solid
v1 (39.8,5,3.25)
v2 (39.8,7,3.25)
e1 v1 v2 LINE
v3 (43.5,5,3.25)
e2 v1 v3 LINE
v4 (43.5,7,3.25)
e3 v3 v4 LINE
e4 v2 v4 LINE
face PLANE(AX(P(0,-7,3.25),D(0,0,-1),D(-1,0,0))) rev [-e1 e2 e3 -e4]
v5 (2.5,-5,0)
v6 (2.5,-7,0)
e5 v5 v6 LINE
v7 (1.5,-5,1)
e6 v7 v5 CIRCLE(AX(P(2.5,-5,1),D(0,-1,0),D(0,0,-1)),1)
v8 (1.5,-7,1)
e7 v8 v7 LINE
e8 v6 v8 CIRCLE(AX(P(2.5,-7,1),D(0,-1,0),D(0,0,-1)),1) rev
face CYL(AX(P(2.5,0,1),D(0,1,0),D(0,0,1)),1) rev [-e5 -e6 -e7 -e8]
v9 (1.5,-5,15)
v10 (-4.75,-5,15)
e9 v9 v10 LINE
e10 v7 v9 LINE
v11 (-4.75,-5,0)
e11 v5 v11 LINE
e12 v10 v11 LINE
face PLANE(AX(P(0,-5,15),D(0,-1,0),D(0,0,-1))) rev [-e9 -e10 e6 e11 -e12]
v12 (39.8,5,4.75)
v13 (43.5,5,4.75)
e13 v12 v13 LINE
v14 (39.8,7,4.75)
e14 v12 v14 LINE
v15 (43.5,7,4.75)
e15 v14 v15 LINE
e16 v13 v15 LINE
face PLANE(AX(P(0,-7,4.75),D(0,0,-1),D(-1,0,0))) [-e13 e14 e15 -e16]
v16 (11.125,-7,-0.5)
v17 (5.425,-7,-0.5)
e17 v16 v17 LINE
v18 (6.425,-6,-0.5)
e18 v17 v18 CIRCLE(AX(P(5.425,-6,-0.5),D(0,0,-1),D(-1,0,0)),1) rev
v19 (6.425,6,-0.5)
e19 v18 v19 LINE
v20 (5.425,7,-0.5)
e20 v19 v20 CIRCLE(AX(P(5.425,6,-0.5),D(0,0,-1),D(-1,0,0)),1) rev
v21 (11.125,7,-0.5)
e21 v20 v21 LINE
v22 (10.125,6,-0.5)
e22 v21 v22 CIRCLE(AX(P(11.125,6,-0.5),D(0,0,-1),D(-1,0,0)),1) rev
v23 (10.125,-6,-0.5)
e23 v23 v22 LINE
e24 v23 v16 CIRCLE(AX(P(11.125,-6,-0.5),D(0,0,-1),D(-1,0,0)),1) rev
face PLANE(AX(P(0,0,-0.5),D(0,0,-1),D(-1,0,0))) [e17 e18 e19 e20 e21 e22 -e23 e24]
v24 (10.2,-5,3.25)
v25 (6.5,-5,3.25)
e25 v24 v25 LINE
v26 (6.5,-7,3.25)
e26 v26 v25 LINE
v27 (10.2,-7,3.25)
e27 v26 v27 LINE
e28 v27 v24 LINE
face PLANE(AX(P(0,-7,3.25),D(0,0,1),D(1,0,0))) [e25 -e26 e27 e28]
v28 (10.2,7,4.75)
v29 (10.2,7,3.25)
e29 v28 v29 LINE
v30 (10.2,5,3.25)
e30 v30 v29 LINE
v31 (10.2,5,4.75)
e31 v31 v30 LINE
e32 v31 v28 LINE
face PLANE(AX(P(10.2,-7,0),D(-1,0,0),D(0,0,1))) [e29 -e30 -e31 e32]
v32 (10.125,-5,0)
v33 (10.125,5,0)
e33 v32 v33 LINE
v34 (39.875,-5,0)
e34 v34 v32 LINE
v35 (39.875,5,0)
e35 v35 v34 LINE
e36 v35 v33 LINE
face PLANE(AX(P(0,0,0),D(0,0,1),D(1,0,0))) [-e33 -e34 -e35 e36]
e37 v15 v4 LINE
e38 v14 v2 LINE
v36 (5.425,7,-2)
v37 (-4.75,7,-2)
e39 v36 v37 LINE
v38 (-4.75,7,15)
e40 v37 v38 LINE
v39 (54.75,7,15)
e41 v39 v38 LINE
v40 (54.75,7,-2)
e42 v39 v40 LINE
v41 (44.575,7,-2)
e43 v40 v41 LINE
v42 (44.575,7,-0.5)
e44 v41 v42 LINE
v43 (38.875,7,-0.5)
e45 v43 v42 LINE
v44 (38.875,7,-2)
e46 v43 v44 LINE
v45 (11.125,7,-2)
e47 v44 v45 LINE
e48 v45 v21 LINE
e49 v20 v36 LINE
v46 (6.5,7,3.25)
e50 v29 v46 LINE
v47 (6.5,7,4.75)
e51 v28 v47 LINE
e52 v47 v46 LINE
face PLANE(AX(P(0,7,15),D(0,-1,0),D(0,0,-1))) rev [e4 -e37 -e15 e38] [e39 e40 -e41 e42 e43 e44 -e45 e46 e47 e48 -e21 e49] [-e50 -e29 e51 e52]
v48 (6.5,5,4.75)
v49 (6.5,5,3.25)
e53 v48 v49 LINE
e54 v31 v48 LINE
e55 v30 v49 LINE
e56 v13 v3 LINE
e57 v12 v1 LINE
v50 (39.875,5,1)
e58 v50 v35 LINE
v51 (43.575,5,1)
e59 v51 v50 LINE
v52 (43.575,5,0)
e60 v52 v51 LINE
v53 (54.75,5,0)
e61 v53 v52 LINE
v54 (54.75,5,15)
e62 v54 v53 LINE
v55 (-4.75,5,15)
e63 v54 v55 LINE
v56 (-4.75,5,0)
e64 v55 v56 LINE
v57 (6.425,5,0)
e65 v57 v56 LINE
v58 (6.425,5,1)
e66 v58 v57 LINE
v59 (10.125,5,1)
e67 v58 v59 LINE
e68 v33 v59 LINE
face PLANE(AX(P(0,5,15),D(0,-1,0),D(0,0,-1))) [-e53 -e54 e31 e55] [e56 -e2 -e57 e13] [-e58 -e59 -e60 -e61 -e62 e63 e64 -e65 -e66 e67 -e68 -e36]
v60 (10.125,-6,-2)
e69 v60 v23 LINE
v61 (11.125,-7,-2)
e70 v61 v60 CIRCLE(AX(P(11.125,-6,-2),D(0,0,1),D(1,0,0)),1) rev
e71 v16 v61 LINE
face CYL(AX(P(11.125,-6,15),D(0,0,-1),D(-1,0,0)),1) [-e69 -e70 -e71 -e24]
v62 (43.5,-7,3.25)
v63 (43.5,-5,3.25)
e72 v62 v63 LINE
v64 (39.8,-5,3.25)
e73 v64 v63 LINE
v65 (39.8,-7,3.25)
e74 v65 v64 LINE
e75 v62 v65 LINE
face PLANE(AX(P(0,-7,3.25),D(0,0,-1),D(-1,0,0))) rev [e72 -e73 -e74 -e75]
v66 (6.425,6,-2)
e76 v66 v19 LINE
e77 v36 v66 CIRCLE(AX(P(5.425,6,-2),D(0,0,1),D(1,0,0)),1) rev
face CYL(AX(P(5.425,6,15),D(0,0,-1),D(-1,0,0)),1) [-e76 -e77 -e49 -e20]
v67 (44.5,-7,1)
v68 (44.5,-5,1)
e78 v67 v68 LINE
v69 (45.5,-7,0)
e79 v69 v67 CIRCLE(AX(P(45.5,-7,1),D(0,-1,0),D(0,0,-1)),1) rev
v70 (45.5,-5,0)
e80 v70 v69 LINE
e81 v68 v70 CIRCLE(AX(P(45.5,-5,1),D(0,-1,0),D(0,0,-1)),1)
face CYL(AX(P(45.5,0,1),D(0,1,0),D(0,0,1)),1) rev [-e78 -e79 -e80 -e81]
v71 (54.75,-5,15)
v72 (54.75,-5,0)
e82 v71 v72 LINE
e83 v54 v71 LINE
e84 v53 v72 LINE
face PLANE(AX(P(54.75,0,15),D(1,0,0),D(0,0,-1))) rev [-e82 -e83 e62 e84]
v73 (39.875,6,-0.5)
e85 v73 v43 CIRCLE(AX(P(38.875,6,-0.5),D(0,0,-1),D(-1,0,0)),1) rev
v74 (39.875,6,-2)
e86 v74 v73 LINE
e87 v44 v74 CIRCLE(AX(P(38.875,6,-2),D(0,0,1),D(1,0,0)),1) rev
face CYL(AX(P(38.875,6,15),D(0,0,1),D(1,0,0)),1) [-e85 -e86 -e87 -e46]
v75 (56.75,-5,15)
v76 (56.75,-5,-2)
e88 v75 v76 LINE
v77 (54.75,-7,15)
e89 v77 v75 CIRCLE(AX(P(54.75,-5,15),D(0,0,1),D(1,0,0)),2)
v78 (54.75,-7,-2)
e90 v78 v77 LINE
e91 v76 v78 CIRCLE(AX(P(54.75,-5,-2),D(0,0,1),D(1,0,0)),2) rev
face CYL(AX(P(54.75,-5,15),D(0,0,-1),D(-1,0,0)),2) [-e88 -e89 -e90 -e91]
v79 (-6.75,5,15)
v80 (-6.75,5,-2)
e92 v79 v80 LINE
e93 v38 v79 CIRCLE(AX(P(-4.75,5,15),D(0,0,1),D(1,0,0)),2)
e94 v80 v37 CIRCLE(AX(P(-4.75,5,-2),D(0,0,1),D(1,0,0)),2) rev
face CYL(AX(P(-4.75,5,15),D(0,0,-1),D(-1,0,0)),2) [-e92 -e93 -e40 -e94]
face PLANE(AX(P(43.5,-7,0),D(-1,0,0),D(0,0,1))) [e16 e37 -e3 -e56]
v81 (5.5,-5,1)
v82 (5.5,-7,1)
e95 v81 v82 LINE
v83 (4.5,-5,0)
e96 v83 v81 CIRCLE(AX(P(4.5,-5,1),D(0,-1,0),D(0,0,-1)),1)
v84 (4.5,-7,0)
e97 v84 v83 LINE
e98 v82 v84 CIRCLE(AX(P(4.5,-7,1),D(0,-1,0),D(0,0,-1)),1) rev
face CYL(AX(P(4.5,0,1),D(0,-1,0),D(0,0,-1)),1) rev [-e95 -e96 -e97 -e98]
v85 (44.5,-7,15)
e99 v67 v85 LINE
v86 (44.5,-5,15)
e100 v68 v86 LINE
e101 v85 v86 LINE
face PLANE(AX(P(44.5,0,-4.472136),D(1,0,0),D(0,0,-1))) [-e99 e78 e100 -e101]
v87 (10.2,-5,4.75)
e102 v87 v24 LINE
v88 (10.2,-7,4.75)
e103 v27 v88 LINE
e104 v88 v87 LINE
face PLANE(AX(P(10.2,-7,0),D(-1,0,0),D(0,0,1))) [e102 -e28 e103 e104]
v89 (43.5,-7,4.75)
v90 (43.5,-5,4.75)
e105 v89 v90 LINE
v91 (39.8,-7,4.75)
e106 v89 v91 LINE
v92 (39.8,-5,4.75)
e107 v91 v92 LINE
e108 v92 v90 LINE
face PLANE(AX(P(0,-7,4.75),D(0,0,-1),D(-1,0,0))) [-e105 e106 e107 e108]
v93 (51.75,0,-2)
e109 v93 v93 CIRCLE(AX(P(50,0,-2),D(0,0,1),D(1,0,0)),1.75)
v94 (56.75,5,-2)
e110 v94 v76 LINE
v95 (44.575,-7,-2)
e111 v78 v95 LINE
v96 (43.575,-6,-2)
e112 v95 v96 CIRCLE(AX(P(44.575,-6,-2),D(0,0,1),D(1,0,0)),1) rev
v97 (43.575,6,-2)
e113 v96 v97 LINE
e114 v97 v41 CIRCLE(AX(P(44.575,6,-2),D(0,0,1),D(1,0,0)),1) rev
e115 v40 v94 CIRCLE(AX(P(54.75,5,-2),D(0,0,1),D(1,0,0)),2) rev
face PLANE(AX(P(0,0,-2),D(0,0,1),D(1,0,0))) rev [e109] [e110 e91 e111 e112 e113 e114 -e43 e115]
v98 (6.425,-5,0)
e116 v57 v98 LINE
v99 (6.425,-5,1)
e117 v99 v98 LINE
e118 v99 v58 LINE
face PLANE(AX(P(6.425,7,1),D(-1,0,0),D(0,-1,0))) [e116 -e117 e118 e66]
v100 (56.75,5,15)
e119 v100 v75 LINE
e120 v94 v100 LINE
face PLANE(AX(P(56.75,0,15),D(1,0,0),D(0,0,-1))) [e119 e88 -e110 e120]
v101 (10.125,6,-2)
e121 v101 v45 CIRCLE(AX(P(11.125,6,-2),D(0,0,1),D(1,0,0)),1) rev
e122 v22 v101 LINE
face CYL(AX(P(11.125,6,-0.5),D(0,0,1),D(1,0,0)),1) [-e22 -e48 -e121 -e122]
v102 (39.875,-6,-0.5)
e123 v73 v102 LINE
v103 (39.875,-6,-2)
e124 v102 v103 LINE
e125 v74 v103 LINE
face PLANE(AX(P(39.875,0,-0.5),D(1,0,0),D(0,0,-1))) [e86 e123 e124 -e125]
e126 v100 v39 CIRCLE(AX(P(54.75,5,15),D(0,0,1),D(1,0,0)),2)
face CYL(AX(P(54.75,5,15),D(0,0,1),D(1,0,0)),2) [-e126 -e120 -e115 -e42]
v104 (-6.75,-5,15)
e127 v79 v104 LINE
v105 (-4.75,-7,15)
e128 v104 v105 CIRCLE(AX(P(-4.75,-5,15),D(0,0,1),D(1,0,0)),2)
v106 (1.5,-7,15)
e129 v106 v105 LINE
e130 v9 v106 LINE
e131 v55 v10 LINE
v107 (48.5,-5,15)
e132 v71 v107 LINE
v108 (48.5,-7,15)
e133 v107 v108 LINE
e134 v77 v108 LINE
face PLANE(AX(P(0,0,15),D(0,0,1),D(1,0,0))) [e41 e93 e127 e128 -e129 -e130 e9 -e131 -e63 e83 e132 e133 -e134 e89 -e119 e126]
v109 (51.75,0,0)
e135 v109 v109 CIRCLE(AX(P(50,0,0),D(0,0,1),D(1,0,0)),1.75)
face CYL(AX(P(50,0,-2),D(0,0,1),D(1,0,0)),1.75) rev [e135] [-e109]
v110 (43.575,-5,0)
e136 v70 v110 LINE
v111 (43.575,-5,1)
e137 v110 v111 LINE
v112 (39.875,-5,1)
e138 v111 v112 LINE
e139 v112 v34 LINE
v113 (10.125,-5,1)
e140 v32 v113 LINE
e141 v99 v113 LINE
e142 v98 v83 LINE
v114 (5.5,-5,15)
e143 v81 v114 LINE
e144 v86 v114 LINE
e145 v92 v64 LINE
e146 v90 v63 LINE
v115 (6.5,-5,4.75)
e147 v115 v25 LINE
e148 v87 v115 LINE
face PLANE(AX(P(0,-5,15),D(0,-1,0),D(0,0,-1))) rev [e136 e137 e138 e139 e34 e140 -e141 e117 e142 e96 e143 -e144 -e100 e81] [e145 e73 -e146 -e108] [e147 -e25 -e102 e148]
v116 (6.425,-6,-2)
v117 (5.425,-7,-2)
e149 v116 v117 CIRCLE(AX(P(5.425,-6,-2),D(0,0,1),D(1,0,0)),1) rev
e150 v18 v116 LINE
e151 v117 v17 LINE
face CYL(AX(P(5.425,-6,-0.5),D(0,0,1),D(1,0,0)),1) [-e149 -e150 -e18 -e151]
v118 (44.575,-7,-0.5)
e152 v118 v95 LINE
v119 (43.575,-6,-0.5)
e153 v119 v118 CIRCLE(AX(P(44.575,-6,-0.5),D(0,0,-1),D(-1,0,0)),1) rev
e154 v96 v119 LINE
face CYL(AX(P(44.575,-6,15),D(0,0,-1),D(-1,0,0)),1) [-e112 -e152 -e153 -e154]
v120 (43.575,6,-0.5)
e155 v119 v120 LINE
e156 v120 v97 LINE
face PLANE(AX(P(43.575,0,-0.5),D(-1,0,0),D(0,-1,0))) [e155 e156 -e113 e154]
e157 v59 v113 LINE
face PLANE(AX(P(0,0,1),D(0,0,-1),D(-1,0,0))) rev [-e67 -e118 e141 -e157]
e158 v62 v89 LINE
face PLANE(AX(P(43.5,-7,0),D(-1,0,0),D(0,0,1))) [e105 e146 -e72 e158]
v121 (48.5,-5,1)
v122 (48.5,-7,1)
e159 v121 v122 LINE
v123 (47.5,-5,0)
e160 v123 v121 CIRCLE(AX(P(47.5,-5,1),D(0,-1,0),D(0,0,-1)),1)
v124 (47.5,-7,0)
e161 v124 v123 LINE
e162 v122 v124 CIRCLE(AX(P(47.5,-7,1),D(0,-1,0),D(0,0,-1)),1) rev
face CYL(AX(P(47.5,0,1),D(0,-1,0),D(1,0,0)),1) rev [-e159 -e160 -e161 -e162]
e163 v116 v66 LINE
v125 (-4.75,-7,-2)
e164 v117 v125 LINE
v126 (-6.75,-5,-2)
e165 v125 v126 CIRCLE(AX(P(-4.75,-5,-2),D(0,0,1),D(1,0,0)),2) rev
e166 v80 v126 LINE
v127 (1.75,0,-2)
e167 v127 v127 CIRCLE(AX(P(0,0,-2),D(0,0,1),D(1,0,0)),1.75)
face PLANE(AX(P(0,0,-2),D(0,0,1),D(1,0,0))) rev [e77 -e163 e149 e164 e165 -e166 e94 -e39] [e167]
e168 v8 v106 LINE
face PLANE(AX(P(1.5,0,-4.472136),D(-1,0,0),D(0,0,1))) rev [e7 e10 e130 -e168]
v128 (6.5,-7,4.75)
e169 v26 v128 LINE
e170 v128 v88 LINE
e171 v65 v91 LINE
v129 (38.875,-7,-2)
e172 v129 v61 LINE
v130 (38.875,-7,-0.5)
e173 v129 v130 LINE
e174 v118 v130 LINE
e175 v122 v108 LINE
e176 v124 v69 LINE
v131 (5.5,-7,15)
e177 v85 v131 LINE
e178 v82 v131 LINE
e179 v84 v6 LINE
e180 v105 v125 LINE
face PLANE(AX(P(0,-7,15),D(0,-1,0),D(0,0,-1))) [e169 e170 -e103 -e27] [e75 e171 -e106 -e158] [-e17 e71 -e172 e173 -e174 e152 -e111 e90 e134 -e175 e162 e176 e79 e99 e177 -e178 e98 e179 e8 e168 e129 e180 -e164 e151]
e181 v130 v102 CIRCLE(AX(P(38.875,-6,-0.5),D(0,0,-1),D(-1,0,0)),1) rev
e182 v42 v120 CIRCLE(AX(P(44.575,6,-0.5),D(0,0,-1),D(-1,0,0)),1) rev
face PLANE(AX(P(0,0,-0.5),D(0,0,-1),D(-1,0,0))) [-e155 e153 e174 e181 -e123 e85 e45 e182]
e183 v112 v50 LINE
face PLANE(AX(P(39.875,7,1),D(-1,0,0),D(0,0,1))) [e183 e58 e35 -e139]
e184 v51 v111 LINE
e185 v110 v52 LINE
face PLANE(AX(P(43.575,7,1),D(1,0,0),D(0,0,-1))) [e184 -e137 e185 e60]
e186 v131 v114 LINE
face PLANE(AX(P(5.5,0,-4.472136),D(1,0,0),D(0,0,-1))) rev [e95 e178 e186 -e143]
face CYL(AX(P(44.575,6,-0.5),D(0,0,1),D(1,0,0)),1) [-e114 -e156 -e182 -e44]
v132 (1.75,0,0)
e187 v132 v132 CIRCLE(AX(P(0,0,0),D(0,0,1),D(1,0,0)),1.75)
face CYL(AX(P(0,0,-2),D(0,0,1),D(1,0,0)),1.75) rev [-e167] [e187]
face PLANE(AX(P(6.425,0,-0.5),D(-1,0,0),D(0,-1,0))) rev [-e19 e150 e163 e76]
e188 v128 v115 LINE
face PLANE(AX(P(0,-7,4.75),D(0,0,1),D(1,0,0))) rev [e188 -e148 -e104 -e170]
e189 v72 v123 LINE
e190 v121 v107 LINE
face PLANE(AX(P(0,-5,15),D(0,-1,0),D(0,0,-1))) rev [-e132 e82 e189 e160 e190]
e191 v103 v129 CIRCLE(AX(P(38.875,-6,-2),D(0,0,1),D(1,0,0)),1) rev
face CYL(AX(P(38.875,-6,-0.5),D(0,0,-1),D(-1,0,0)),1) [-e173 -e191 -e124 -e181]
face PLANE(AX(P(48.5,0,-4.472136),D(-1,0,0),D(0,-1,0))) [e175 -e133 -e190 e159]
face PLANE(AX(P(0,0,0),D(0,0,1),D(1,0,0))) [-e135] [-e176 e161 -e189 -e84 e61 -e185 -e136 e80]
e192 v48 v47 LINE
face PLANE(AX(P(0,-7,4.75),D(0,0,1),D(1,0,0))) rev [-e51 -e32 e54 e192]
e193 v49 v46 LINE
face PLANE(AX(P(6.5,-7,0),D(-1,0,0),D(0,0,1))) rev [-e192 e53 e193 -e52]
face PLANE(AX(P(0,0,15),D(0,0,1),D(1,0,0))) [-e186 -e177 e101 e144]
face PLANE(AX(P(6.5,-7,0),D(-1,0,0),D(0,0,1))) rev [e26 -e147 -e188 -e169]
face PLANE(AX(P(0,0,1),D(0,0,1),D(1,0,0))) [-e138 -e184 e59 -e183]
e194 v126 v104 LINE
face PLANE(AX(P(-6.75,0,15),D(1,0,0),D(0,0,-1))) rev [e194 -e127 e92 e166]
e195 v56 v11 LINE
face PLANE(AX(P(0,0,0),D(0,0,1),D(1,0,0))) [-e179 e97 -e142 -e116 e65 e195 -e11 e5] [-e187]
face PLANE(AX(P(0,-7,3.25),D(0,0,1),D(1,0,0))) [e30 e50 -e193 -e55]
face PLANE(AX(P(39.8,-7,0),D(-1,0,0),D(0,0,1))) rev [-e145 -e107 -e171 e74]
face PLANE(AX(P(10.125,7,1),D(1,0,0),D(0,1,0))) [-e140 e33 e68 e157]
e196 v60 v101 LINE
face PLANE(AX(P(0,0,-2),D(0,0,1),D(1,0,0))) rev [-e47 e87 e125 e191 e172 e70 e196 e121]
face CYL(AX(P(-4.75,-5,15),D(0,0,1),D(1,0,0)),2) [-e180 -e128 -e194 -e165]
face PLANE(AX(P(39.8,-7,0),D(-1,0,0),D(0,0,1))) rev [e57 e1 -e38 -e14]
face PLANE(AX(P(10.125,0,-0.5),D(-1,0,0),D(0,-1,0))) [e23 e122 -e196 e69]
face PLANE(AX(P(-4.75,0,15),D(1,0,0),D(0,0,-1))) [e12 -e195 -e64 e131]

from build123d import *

# Parameters (mm, degrees)
SKETCH1_W              = 2
SKETCH1_H              = 2
SKETCH1_H_2            = 10
SKETCH1_W_2            = 59.5
BOSS_EXTRUDE1_DEPTH    = 15
SKETCH1_5_W            = 59.5
SKETCH1_5_H            = 10
SKETCH1_5_R            = 1.75
SKETCH1_5_H_2          = 2
SKETCH1_5_W_2          = 2
BOSS_EXTRUDE2_DEPTH    = 2
SKETCH2_W              = 4
SKETCH2_H              = 2
CUT_EXTRUDE1_DEPTH     = 15
CUT_EXTRUDE2_START     = -14
CUT_EXTRUDE2_OUTLINE_W = 3.7
CUT_EXTRUDE2_OUTLINE_H = 1.5
CUT_EXTRUDE2_DEPTH     = 14
CUT_EXTRUDE3_DEPTH     = 1.5
FILLET1_R              = 2
FILLET2_R              = 1
SKETCH11_W             = 3.7
SKETCH11_H             = 14
BOSS_EXTRUDE4_DEPTH    = 1.5


# Read off the part's stored shape, not the designer's step: Cut-Extrude2
with BuildPart() as part:
    # Sketch1 → Boss-Extrude1 (new body)
    with BuildSketch(Plane.XY):
        with Locations((55.75, 6)):
            Rectangle(SKETCH1_W, SKETCH1_H)
        with Locations((55.75, 0)):
            Rectangle(SKETCH1_W, SKETCH1_H_2)
        with Locations((-5.75, 0)):
            Rectangle(SKETCH1_W, SKETCH1_H_2)
        with Locations((-5.75, 6)):
            Rectangle(SKETCH1_W, SKETCH1_H)
        with Locations((25, 6)):
            Rectangle(SKETCH1_W_2, SKETCH1_H)
        with Locations((-5.75, -6)):
            Rectangle(SKETCH1_W, SKETCH1_H)
        with Locations((25, -6)):
            Rectangle(SKETCH1_W_2, SKETCH1_H)
        with Locations((55.75, -6)):
            Rectangle(SKETCH1_W, SKETCH1_H)
    extrude(amount=BOSS_EXTRUDE1_DEPTH)

    # Sketch1<5> → Boss-Extrude2 (add)
    # profile 1 of 9: a face of its own
    with BuildSketch(Plane.XY):
        with Locations((25, 0)):
            Rectangle(SKETCH1_5_W, SKETCH1_5_H)
        Circle(SKETCH1_5_R, mode=Mode.SUBTRACT)
        with Locations((50, 0)):
            Circle(SKETCH1_5_R, mode=Mode.SUBTRACT)
    # profile 2 of 9: a face of its own
    with BuildSketch(Plane.XY):
        with Locations((25, 6)):
            Rectangle(SKETCH1_5_W, SKETCH1_5_H_2)
    # profile 3 of 9: a face of its own
    with BuildSketch(Plane.XY):
        with Locations((25, -6)):
            Rectangle(SKETCH1_5_W, SKETCH1_5_H_2)
    # profile 4 of 9: a face of its own
    with BuildSketch(Plane.XY):
        with Locations((55.75, 0)):
            Rectangle(SKETCH1_5_W_2, SKETCH1_5_H)
    # profile 5 of 9: a face of its own
    with BuildSketch(Plane.XY):
        with Locations((55.75, 6)):
            Rectangle(SKETCH1_5_W_2, SKETCH1_5_H_2)
    # profile 6 of 9: a face of its own
    with BuildSketch(Plane.XY):
        with Locations((55.75, -6)):
            Rectangle(SKETCH1_5_W_2, SKETCH1_5_H_2)
    # profile 7 of 9: a face of its own
    with BuildSketch(Plane.XY):
        with Locations((-5.75, 6)):
            Rectangle(SKETCH1_5_W_2, SKETCH1_5_H_2)
    # profile 8 of 9: a face of its own
    with BuildSketch(Plane.XY):
        with Locations((-5.75, 0)):
            Rectangle(SKETCH1_5_W_2, SKETCH1_5_H)
    # profile 9 of 9: a face of its own
    with BuildSketch(Plane.XY):
        with Locations((-5.75, -6)):
            Rectangle(SKETCH1_5_W_2, SKETCH1_5_H_2)
    extrude(amount=-BOSS_EXTRUDE2_DEPTH)

    # Sketch2 → Cut-Extrude1 (cut)
    with BuildSketch(Plane.XY.offset(15)):
        with Locations((3.5, -6)):
            Rectangle(SKETCH2_W, SKETCH2_H)
        with Locations((46.5, -6)):
            Rectangle(SKETCH2_W, SKETCH2_H)
    extrude(amount=-CUT_EXTRUDE1_DEPTH, mode=Mode.SUBTRACT)

    # Cut-Extrude2 outline → Cut-Extrude2 (cut)
    with BuildSketch(Plane(origin=(0, 7, 0), x_dir=(1, 0, 0), z_dir=(0, 1, 0)).offset(CUT_EXTRUDE2_START)):
        with Locations((8.35, -4)):
            Rectangle(CUT_EXTRUDE2_OUTLINE_W, CUT_EXTRUDE2_OUTLINE_H)
        with Locations((41.65, -4)):
            Rectangle(CUT_EXTRUDE2_OUTLINE_W, CUT_EXTRUDE2_OUTLINE_H)
    extrude(amount=CUT_EXTRUDE2_DEPTH, mode=Mode.SUBTRACT)

    # Sketch4 → Cut-Extrude3 (cut)
    with BuildSketch(Plane(origin=(0, 0, -2), x_dir=(-1, 0, 0), z_dir=(0, 0, -1))):
        Polygon((-10.125, 7), (-10.125, 5), (-10.125, -5), (-10.125, -7), (-6.425, -7), (-6.425, 7), align=None)
        Polygon((-39.875, 5), (-39.875, 7), (-43.575, 7), (-43.575, -7), (-39.875, -7), (-39.875, -5), align=None)
    extrude(amount=-CUT_EXTRUDE3_DEPTH, mode=Mode.SUBTRACT)

    # Fillet1
    fillet1_edges = [part.edges().sort_by_distance(p)[0] for p in [
        (-6.75, 7, 6.5),
        (56.75, 7, 6.5),
        (56.75, -7, 6.5),
        (-6.75, -7, 6.5),
    ]]
    fillet(fillet1_edges, radius=FILLET1_R)

    # Fillet2
    fillet2_edges = [part.edges().sort_by_distance(p)[0] for p in [
        (10.125, -7, -1.25),
        (10.125, 7, -1.25),
        (6.425, 7, -1.25),
        (6.425, -7, -1.25),
        (39.875, 7, -1.25),
        (39.875, -7, -1.25),
        (43.575, -7, -1.25),
        (43.575, 7, -1.25),
        (1.5, -6, 0),
        (5.5, -6, 0),
        (48.5, -6, 0),
        (44.5, -6, 0),
    ]]
    fillet(fillet2_edges, radius=FILLET2_R)

    # Sketch11 → Boss-Extrude4 (add)
    with BuildSketch(Plane(origin=(0, 0, -0.5), x_dir=(-1, 0, 0), z_dir=(0, 0, -1))):
        with Locations((-41.725, 0)):
            Rectangle(SKETCH11_W, SKETCH11_H)
        with Locations((-8.275, 0)):
            Rectangle(SKETCH11_W, SKETCH11_H)
    extrude(amount=-BOSS_EXTRUDE4_DEPTH)


solid = part.part
